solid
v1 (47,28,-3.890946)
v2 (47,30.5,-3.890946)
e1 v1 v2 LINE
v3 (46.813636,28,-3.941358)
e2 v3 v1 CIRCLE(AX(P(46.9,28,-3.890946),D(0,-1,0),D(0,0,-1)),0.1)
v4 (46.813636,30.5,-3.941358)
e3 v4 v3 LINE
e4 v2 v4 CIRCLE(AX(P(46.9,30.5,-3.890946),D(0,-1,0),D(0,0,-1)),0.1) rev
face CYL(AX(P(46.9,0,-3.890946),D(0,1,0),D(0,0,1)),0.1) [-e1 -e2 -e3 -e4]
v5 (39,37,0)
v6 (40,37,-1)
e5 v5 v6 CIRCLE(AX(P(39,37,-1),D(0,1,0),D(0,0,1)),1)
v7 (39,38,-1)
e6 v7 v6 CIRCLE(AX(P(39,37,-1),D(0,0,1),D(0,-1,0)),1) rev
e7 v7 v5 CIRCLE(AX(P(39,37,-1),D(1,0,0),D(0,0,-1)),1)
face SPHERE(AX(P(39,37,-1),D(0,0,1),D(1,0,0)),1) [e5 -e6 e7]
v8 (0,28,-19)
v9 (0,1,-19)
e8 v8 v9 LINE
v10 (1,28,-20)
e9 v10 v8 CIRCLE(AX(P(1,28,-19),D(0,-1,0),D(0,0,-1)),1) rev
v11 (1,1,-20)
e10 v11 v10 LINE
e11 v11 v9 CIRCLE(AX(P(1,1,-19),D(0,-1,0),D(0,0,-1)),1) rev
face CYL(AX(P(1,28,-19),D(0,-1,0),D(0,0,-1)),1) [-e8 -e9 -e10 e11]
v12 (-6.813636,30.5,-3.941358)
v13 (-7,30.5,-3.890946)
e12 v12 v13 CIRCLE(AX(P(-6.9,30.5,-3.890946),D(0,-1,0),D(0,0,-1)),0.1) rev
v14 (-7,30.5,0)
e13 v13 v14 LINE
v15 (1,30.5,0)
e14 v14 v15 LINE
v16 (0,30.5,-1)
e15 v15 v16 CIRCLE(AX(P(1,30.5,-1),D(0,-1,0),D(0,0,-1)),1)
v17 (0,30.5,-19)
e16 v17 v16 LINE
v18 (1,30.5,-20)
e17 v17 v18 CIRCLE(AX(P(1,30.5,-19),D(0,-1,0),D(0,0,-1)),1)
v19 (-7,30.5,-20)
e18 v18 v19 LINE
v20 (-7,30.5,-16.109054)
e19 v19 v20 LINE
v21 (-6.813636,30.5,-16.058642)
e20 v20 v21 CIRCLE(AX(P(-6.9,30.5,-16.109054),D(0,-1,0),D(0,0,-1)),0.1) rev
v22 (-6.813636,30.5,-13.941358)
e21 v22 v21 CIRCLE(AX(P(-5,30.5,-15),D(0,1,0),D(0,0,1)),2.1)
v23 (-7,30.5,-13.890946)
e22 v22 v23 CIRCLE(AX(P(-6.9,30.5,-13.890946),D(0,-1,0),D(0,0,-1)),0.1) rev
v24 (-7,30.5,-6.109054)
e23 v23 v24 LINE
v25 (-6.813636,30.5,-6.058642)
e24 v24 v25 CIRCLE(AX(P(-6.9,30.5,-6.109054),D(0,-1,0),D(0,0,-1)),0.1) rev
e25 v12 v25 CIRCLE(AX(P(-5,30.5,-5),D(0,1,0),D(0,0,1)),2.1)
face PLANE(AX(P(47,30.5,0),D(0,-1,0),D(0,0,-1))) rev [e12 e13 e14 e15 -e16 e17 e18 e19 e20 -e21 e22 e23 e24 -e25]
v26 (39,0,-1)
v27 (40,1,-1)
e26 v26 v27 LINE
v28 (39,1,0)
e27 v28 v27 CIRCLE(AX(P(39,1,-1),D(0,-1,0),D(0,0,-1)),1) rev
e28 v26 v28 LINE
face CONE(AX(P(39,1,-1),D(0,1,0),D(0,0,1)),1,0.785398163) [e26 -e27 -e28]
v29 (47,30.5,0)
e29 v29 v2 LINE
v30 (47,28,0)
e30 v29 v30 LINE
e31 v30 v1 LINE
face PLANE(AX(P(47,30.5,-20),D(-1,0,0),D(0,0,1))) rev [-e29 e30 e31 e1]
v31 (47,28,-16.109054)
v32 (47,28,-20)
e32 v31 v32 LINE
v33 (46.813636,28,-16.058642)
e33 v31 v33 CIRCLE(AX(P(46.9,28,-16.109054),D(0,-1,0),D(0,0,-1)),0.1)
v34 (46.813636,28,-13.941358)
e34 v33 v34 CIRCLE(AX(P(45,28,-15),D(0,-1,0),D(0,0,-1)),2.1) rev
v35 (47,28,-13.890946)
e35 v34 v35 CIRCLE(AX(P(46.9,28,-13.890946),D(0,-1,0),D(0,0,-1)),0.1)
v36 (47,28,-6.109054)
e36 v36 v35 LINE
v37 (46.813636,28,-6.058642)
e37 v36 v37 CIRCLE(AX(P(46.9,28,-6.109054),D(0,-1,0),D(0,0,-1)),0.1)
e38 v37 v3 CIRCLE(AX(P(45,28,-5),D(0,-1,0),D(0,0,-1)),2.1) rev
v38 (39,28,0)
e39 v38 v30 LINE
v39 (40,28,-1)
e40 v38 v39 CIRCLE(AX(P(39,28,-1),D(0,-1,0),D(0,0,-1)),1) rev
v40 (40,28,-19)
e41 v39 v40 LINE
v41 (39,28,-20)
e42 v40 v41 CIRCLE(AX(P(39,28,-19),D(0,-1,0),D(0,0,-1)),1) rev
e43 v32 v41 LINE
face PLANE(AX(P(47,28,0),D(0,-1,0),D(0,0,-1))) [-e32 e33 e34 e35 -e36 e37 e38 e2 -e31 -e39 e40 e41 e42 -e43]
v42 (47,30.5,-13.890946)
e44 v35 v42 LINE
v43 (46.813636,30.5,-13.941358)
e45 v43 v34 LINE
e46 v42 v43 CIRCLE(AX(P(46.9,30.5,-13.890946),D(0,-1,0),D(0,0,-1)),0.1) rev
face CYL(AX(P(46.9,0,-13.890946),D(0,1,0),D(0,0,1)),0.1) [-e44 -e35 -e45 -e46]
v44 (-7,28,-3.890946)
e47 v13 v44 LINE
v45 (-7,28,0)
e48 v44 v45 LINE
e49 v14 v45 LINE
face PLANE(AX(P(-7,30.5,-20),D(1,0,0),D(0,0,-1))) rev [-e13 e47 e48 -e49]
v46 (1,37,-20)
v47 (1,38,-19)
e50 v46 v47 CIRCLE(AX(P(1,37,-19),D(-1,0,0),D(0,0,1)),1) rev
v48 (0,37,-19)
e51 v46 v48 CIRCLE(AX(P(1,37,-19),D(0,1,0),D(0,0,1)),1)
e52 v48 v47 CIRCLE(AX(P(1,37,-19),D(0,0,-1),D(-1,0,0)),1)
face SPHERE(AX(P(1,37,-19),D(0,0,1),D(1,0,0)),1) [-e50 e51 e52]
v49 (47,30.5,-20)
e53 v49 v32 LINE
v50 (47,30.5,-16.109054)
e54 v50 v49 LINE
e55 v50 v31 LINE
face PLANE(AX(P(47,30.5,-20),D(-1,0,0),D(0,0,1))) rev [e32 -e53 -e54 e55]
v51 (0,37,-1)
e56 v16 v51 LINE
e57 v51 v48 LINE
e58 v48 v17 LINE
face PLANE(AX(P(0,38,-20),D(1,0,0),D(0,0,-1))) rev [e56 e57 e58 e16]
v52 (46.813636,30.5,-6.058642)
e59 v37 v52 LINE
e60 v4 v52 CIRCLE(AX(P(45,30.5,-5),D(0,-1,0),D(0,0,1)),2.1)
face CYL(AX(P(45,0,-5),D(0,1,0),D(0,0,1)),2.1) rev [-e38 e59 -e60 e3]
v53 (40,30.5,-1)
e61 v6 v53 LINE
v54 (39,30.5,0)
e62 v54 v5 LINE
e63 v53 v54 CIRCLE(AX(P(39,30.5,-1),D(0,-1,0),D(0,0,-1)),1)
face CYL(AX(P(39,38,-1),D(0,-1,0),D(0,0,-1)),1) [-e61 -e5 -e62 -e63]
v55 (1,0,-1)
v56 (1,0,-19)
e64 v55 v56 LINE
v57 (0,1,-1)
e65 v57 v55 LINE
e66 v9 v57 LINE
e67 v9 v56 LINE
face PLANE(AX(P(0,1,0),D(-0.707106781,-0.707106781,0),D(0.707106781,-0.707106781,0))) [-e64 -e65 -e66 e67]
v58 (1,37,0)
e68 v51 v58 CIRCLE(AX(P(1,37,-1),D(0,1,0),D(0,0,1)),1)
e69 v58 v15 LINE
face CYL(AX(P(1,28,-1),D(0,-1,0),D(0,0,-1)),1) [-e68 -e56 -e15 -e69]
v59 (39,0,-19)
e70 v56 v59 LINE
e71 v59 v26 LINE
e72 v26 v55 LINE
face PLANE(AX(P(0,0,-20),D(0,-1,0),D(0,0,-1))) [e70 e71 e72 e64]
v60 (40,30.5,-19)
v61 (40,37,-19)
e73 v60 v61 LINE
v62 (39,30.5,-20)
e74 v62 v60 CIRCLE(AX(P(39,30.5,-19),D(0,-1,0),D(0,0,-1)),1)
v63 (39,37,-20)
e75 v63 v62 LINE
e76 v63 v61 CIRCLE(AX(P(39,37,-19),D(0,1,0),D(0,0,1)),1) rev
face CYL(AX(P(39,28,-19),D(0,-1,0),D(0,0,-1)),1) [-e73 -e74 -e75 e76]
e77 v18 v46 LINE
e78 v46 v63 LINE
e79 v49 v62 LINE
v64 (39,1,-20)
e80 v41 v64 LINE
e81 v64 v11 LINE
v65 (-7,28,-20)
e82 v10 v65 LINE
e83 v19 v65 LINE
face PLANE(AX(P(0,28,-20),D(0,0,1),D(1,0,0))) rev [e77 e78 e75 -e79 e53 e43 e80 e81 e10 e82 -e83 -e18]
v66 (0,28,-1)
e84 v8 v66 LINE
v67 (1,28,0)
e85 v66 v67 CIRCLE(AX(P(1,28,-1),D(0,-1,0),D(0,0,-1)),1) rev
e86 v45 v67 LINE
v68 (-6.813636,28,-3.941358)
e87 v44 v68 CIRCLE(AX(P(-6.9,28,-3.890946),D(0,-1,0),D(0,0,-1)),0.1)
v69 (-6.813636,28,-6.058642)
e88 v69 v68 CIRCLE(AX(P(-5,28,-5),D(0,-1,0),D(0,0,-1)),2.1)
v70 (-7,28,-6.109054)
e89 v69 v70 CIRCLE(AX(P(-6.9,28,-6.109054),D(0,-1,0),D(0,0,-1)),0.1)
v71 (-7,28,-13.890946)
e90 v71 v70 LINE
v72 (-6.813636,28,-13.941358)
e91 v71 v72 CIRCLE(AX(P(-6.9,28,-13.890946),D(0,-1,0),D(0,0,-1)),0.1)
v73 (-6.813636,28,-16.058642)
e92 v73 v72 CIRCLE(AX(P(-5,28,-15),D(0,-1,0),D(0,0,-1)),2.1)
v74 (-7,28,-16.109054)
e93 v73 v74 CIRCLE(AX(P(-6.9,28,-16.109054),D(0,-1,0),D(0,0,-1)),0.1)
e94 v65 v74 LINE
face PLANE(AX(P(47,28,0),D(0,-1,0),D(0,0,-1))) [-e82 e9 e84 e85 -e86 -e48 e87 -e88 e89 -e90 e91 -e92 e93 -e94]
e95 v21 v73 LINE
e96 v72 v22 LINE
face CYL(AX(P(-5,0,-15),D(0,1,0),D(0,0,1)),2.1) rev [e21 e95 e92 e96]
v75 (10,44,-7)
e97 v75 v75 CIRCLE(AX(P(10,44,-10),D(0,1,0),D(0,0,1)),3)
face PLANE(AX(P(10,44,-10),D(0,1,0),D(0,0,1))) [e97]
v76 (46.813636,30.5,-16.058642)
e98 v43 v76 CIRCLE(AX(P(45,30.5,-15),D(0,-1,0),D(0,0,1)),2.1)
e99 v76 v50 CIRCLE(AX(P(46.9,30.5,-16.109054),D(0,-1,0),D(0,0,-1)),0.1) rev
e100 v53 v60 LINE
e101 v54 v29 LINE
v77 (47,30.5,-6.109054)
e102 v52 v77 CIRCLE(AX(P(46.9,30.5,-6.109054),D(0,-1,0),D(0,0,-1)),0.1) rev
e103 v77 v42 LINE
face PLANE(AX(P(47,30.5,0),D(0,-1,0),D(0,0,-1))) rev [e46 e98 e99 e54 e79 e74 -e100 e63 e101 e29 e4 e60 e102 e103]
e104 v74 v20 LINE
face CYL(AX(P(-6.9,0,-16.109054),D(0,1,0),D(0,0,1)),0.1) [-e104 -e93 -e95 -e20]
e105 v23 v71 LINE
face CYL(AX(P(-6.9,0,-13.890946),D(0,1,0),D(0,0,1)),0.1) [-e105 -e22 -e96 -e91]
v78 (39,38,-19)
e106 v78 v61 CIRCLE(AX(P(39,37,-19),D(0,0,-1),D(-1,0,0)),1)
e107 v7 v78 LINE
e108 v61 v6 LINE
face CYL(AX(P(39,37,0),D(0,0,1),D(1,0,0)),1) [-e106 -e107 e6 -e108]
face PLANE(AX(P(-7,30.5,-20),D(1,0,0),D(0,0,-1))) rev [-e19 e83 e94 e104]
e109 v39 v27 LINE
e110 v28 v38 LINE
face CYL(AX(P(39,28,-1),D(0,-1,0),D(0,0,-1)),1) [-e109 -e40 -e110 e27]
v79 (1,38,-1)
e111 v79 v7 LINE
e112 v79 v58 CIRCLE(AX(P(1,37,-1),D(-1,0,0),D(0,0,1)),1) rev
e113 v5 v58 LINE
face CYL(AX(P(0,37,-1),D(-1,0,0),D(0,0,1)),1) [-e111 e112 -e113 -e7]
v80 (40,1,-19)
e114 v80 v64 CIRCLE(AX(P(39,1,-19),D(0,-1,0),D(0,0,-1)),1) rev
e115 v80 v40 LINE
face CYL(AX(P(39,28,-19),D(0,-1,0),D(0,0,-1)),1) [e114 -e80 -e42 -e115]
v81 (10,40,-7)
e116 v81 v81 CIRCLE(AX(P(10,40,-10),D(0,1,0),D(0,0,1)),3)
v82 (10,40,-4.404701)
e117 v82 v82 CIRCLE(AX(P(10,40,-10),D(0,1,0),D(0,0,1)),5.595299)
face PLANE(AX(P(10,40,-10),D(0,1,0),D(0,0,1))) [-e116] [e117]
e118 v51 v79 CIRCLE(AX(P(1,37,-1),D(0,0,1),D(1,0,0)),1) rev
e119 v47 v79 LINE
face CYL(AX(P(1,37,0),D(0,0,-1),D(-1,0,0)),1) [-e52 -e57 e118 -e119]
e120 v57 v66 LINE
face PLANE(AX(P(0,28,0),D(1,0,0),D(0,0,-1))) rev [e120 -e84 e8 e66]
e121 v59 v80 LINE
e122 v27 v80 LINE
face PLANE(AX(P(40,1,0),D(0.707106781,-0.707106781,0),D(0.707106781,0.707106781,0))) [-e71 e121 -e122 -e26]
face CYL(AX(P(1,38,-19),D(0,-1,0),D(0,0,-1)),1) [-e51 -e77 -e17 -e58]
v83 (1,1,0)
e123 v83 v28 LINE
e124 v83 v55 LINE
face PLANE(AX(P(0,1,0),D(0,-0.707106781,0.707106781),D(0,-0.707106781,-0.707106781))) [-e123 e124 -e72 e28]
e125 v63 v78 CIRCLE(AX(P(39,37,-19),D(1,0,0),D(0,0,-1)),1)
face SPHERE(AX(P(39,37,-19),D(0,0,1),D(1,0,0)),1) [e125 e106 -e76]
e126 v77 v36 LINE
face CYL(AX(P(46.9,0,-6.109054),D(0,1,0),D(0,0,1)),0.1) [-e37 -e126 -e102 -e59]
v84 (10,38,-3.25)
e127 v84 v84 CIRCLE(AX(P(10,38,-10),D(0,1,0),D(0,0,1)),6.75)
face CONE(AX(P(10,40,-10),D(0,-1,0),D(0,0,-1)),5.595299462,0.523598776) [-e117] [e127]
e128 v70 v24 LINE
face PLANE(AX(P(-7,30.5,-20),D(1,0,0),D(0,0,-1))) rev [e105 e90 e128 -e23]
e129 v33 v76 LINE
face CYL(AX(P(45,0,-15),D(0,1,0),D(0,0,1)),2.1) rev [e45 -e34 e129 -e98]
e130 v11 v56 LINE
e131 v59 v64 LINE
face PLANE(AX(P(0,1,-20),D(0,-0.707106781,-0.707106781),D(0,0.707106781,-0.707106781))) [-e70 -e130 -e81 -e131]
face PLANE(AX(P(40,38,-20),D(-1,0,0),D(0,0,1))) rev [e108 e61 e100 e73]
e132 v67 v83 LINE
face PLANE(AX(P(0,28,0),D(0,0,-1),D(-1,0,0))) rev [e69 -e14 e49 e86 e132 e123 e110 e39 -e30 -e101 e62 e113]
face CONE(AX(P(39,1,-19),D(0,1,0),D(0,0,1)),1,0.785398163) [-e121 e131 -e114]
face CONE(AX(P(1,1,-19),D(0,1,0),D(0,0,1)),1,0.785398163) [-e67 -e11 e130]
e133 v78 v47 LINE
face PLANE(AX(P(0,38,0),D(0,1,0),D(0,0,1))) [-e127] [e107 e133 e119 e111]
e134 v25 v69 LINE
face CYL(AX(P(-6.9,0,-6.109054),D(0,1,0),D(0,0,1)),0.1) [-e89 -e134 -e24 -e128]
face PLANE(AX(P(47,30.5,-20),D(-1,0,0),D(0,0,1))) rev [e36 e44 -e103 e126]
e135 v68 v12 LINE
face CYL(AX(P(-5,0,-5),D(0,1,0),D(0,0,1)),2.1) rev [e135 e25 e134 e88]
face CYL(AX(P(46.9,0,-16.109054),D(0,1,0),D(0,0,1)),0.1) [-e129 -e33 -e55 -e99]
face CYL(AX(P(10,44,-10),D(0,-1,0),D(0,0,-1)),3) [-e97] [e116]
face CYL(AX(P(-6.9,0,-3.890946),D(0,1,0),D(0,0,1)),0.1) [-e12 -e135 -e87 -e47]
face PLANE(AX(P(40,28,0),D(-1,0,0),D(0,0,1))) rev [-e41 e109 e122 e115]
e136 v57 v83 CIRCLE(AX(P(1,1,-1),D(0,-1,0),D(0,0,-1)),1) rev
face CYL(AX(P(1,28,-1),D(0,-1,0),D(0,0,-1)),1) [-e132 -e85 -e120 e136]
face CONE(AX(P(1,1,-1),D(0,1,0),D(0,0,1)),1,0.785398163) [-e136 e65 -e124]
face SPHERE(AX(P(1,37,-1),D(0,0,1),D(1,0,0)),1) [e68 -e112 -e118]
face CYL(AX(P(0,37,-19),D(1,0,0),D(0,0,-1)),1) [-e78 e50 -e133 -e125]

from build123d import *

# Parameters (mm, degrees)
SKETCH1_W           = 40
SKETCH1_H           = 20
BOSS_EXTRUDE1_DEPTH = 28
SKETCH2_W           = 54
SKETCH2_H           = 20
BOSS_EXTRUDE2_DEPTH = 2.5
SKETCH3_W           = 40
SKETCH3_H           = 20
BOSS_EXTRUDE3_DEPTH = 7.5
SKETCH4_R           = 6.75
BOSS_EXTRUDE4_DEPTH = 2
SKETCH5_R           = 3
BOSS_EXTRUDE5_DEPTH = 4
FILLET1_R           = 1
CHAMFER1_SIZE       = 1
CHAMFER2_SIZE2      = 1.154700538
CHAMFER2_SIZE       = 2
SKETCH6_R           = 2.1
CUT_EXTRUDE1_DEPTH  = 60.491596045
FILLET2_R           = 0.1


with BuildPart() as part:
    # Sketch1 → Boss-Extrude1 (new body)
    with BuildSketch(Plane(origin=(0, 0, 0), x_dir=(1, 0, 0), z_dir=(0, 1, 0))):
        with Locations((20, 10)):
            Rectangle(SKETCH1_W, SKETCH1_H)
    extrude(amount=BOSS_EXTRUDE1_DEPTH)

    # Sketch2 → Boss-Extrude2 (add)
    with BuildSketch(Plane(origin=(0, 28, 0), x_dir=(1, 0, 0), z_dir=(0, 1, 0))):
        with Locations((20, 10)):
            Rectangle(SKETCH2_W, SKETCH2_H)
    extrude(amount=BOSS_EXTRUDE2_DEPTH)

    # Sketch3 → Boss-Extrude3 (add)
    with BuildSketch(Plane(origin=(0, 30.5, 0), x_dir=(1, 0, 0), z_dir=(0, 1, 0))):
        with Locations((20, 10)):
            Rectangle(SKETCH3_W, SKETCH3_H)
    extrude(amount=BOSS_EXTRUDE3_DEPTH)

    # Sketch4 → Boss-Extrude4 (add)
    with BuildSketch(Plane(origin=(0, 38, 0), x_dir=(1, 0, 0), z_dir=(0, 1, 0))):
        with Locations(Location((10, 10, 0), (0, 0, 270))):
            Circle(SKETCH4_R)
    extrude(amount=BOSS_EXTRUDE4_DEPTH)

    # Sketch5 → Boss-Extrude5 (add)
    with BuildSketch(Plane(origin=(0, 40, 0), x_dir=(1, 0, 0), z_dir=(0, 1, 0))):
        with Locations(Location((10, 10, 0), (0, 0, 270))):
            Circle(SKETCH5_R)
    extrude(amount=BOSS_EXTRUDE5_DEPTH)

    # Fillet1
    fillet1_edges = [part.edges().sort_by_distance(p)[0] for p in [
        (40, 14, -20),
        (40, 34.25, -20),
        (40, 34.25, 0),
        (40, 14, 0),
        (0, 34.25, 0),
        (0, 14, 0),
        (0, 14, -20),
        (0, 34.25, -20),
        (20, 38, -20),
        (40, 38, -10),
        (0, 38, -10),
        (20, 38, 0),
    ]]
    fillet(fillet1_edges, radius=FILLET1_R)

    # Chamfer1
    chamfer1_edges = [part.edges().sort_by_distance(p)[0] for p in [
        (20, 0, -20),
        (0, 0, -10),
        (40, 0, -10),
        (20, 0, 0),
        (0.292893219, 0, -19.707106781),
        (0.292893219, 0, -0.292893219),
        (39.707106781, 0, -0.292893219),
        (39.707106781, 0, -19.707106781),
    ]]
    chamfer(chamfer1_edges, length=CHAMFER1_SIZE)

    # Chamfer2
    chamfer2_edges = [part.edges().sort_by_distance(p)[0] for p in [
        (10, 40, -16.75),
    ]]
    chamfer2_side = [part.faces().sort_by_distance(p)[0] for p in [
        (10, 39.976905989, -16.75),
    ]]
    chamfer(chamfer2_edges, length=CHAMFER2_SIZE - 0.0001, length2=CHAMFER2_SIZE2 - 0.0001, reference=chamfer2_side[0])  # a hair under: the kernel refuses the full size

    # Sketch6 → Cut-Extrude1 (cut, through all)
    with BuildSketch(Plane(origin=(0, 30.5, 0), x_dir=(1, 0, 0), z_dir=(0, 1, 0))):
        with Locations((-5, 5)):
            Circle(SKETCH6_R)
        with Locations((-5, 15)):
            Circle(SKETCH6_R)
    cut_extrude1 = extrude(amount=-CUT_EXTRUDE1_DEPTH, mode=Mode.SUBTRACT)

    # Mirror2: Cut-Extrude1 across plane
    add(cut_extrude1.mirror(Plane.ZY.offset(-20)), mode=Mode.SUBTRACT)

    # Fillet2
    fillet2_edges = [part.edges().sort_by_distance(p)[0] for p in [
        (-7, 29.25, -4.359687576),
        (-7, 29.25, -5.640312424),
        (-7, 29.25, -15.640312424),
        (-7, 29.25, -14.359687576),
        (47, 29.25, -4.359687576),
        (47, 29.25, -5.640312424),
        (47, 29.25, -14.359687576),
        (47, 29.25, -15.640312424),
    ]]
    fillet(fillet2_edges, radius=FILLET2_R)


solid = part.part
